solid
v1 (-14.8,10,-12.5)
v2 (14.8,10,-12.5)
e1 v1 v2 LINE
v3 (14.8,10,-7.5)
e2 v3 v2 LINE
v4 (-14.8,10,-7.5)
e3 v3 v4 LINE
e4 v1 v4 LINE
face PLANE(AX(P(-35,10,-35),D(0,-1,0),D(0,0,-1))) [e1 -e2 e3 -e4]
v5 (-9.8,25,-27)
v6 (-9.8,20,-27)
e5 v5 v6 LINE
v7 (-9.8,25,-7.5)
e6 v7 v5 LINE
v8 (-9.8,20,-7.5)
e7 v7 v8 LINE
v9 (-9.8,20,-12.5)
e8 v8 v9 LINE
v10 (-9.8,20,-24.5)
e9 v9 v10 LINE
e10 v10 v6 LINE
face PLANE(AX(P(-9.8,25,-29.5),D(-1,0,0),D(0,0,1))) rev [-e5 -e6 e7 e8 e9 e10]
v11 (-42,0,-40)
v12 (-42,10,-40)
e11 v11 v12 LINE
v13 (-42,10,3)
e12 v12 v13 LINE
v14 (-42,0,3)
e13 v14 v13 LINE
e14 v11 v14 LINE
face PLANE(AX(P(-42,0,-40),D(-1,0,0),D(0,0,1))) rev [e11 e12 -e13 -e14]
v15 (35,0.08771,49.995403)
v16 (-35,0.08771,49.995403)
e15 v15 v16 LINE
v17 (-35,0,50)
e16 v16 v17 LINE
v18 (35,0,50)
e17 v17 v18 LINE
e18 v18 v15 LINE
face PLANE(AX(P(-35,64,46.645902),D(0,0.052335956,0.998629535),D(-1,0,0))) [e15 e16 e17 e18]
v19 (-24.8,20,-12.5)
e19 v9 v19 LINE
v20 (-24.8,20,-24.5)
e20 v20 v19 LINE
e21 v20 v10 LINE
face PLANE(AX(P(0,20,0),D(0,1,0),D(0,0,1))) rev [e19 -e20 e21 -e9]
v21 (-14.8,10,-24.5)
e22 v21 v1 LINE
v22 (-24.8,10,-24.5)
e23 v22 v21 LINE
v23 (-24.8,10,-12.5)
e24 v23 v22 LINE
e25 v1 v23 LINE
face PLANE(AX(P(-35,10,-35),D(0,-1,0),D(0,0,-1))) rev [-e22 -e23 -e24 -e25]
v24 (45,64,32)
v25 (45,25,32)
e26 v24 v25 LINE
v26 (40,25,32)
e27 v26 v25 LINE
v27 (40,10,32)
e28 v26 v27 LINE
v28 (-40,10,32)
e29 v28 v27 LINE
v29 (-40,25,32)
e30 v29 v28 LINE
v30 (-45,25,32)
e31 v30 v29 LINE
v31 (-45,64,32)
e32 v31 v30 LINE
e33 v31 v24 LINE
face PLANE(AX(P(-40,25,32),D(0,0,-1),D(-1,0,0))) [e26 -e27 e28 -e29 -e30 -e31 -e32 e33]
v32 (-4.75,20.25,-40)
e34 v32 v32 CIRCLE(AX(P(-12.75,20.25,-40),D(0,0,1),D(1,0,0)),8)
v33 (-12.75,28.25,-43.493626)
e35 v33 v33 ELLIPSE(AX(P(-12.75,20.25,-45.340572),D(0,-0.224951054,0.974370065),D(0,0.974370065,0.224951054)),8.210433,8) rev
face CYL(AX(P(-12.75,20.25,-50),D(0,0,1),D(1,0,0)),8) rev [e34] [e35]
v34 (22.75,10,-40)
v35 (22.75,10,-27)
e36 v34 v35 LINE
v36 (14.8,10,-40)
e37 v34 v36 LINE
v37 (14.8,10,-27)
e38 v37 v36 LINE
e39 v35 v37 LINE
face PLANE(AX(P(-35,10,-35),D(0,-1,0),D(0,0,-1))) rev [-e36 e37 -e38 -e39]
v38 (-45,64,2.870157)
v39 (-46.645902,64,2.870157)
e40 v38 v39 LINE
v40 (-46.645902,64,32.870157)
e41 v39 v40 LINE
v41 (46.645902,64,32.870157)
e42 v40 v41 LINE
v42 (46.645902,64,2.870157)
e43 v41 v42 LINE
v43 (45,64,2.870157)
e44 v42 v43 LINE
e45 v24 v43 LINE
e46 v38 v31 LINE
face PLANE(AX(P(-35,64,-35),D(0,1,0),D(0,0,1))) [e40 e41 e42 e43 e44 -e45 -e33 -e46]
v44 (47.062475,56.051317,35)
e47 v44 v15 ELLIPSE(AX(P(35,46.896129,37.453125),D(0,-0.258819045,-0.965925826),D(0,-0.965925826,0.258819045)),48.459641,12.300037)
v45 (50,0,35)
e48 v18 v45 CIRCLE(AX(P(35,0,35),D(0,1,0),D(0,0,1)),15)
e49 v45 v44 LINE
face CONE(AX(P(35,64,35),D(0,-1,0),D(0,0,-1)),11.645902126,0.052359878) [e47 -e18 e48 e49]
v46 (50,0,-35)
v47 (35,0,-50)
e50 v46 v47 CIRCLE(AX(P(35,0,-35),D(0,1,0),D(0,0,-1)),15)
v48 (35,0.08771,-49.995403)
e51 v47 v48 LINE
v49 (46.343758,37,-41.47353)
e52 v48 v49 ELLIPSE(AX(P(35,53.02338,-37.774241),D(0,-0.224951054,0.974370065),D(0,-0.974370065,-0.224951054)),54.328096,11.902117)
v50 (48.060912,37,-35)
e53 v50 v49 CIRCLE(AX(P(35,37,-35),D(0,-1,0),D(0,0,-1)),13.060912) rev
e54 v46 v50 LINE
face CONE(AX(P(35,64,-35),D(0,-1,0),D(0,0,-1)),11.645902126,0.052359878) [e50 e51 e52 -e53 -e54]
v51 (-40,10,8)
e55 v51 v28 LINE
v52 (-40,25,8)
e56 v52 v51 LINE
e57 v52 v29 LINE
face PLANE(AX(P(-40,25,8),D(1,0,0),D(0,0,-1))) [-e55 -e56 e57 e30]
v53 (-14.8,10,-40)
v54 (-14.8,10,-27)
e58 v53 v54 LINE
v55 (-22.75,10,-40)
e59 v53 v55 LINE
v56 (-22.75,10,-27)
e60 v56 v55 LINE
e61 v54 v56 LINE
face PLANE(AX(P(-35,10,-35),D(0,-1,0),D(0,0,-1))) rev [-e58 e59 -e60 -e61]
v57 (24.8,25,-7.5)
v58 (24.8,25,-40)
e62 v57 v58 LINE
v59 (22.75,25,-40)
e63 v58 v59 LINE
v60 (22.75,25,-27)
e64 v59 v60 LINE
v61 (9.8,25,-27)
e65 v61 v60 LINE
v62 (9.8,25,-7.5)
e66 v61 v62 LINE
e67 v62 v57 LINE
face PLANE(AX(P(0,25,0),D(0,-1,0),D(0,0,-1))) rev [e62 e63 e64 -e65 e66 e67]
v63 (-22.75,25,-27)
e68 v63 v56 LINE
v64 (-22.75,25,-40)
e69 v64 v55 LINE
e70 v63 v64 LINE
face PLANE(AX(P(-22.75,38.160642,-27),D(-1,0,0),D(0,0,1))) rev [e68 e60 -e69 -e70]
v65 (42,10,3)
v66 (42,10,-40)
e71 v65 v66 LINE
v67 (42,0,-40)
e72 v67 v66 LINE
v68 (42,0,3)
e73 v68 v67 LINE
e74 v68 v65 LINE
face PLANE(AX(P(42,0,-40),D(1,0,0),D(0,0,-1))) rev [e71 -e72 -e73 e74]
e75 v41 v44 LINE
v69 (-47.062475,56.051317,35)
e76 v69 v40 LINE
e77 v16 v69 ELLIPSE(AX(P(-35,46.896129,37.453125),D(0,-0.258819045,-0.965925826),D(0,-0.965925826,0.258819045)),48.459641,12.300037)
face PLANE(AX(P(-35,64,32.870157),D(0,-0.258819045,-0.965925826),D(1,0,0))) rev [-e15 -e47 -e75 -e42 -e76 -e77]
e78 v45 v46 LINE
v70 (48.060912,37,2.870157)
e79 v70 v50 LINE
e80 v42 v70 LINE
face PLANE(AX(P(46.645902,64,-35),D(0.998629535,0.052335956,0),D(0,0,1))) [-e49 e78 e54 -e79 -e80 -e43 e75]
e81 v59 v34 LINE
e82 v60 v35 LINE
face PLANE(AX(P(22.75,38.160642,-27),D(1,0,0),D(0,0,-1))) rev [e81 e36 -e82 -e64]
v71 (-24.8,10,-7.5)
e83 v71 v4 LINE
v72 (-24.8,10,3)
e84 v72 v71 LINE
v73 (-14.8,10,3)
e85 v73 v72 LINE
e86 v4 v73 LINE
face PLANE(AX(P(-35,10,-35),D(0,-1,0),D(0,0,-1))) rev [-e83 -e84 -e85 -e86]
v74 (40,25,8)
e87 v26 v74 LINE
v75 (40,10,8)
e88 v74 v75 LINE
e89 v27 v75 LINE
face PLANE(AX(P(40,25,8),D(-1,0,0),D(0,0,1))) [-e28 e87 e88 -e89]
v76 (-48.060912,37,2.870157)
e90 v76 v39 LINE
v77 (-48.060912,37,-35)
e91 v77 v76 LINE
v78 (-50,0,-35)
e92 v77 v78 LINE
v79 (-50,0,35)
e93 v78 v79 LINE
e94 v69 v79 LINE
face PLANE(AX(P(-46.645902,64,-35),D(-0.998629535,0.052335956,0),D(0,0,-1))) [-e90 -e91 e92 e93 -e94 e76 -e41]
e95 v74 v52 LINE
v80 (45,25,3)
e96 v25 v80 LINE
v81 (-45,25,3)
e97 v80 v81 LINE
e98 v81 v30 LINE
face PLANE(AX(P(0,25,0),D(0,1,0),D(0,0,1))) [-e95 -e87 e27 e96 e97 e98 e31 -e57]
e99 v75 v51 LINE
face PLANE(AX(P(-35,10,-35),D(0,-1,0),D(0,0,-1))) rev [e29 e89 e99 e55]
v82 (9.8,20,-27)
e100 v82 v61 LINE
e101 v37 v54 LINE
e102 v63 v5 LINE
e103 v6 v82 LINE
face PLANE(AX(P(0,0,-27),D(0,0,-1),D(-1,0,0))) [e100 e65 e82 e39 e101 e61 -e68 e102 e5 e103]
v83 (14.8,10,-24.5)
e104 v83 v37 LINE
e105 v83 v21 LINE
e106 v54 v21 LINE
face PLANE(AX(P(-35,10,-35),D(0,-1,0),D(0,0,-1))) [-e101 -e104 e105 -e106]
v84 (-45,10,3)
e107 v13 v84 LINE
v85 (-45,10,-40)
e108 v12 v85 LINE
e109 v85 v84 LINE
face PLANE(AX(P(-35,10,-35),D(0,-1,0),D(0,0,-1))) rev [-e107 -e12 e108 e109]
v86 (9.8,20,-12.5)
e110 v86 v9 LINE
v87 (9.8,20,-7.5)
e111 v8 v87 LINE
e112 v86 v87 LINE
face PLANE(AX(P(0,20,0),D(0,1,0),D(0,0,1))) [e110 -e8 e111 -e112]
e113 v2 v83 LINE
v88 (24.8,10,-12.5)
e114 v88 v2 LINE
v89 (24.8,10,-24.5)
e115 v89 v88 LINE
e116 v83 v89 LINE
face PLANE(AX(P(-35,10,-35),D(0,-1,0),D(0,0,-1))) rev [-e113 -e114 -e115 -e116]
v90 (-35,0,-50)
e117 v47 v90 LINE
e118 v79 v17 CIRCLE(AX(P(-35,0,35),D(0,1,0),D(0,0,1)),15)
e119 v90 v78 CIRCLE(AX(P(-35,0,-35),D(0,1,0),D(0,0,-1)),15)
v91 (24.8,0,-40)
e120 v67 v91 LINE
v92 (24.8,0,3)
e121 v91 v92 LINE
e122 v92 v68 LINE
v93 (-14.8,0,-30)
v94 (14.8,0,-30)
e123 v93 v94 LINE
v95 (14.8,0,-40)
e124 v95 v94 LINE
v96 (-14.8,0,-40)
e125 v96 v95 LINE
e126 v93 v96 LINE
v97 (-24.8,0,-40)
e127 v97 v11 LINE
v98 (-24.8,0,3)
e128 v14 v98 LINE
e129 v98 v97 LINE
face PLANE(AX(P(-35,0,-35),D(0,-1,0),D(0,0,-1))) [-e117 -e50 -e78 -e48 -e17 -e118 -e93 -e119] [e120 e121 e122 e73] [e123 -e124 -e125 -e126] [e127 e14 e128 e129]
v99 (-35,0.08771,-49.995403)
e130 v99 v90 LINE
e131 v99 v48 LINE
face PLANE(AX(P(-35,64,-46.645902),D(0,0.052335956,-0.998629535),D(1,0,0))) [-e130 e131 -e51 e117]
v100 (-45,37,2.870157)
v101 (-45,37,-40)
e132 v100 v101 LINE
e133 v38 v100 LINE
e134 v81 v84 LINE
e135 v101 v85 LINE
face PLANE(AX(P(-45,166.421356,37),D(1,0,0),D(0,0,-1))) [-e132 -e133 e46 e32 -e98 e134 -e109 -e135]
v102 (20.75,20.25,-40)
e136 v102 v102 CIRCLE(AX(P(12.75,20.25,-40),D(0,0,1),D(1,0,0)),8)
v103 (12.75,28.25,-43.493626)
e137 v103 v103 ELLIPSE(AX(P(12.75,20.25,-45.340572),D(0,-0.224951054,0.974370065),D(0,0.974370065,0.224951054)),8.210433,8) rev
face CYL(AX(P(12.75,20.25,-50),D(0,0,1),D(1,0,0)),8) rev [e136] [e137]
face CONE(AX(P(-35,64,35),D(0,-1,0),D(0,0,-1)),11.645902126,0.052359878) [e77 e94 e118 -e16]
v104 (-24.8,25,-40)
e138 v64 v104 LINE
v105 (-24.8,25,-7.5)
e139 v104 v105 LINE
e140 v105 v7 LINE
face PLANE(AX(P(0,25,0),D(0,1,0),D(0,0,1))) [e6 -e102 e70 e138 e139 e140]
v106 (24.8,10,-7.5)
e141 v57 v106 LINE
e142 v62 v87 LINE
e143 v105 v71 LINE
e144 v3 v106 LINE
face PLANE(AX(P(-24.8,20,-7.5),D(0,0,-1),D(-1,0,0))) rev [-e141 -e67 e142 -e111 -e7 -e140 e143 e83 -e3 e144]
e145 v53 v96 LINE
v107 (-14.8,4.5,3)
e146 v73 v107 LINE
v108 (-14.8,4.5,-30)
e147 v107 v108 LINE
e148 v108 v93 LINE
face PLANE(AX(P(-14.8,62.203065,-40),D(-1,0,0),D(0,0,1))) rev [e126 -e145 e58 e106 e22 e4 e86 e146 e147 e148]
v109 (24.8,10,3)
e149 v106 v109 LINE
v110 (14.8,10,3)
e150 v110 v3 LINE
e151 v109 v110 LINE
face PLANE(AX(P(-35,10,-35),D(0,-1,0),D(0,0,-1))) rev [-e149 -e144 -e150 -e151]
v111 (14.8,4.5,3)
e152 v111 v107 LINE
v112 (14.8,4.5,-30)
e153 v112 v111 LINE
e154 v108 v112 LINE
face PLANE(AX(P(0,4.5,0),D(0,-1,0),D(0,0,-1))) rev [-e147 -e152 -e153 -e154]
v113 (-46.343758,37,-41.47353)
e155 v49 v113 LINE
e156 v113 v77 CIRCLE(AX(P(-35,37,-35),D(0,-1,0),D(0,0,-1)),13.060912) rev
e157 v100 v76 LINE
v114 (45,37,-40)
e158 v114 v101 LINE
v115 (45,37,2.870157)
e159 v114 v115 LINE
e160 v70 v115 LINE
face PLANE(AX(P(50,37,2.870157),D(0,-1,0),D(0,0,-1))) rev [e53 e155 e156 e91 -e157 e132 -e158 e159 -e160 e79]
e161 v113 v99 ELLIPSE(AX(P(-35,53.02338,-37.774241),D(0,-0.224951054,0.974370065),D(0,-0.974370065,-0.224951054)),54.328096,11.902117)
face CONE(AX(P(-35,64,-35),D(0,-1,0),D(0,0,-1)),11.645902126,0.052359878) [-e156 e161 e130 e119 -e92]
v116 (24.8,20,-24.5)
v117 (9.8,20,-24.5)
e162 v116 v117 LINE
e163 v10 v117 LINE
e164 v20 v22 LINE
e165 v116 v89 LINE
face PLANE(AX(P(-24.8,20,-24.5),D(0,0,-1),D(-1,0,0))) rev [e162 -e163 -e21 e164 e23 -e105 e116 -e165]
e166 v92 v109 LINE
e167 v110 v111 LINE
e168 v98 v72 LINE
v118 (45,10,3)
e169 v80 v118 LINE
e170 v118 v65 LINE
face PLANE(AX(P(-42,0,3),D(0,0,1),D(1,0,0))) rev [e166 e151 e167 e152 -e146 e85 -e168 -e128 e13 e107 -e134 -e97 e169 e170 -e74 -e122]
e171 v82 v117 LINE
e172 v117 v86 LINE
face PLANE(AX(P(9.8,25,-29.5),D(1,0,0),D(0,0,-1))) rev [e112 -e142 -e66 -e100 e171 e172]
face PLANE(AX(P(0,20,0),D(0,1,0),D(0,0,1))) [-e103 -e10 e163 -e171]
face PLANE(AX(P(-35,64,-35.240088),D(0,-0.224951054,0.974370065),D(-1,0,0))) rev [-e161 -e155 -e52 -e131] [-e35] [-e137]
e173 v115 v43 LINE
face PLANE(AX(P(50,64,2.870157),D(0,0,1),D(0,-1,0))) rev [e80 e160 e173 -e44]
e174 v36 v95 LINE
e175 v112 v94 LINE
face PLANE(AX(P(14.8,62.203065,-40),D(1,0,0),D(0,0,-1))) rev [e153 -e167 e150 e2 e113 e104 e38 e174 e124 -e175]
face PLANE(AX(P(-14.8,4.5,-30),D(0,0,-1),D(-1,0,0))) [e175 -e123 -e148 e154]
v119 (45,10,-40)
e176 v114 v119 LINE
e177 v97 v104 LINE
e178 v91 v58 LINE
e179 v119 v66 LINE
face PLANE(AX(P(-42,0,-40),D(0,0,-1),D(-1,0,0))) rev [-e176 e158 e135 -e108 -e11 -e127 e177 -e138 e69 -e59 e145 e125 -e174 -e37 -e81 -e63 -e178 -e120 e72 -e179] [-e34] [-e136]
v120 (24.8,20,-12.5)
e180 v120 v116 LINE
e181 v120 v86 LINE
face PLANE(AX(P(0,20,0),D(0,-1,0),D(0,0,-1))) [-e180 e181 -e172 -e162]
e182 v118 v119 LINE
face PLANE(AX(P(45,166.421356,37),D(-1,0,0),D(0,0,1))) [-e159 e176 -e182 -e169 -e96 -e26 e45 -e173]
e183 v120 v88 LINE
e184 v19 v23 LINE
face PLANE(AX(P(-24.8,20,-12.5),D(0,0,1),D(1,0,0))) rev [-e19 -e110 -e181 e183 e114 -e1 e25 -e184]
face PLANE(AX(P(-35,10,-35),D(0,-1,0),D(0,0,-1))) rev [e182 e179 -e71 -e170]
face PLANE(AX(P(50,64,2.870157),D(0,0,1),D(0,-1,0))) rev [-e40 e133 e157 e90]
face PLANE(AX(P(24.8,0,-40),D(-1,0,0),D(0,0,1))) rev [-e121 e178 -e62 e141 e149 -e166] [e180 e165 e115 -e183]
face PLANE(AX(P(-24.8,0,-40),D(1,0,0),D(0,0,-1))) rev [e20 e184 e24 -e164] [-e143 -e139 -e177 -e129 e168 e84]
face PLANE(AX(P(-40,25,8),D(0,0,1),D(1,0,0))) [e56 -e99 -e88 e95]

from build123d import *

# Parameters (mm, degrees)
BOSS_EXTRUDE1_DEPTH     = 10
SKETCH2_W               = 17.2
SKETCH2_H               = 43
CUT_EXTRUDE1_DEPTH      = 72.414284285
SKETCH3_W               = 90
SKETCH3_H               = 34
SKETCH3_W_2             = 80
SKETCH3_H_2             = 24
BOSS_EXTRUDE3_DEPTH     = 15
SKETCH4_W               = 49.6
SKETCH4_H               = 5
BOSS_EXTRUDE4_DEPTH     = 10
SKETCH5_W               = 15
SKETCH5_H               = 22
BOSS_EXTRUDE5_DEPTH     = 5
SKETCH6_W               = 90
SKETCH6_H               = 77
BOSS_EXTRUDE6_DEPTH     = 15
BOSS_EXTRUDE8_DEPTH     = 39
CHAMFER1_SIZE           = 64
CHAMFER1_SIZE_2         = 3.354097874
CHAMFER2_SIZE           = 64
CHAMFER2_SIZE_2         = 11.405813635
CHAMFER3_SIZE           = 64
CHAMFER3_SIZE_2         = 13.775745352
CUT_EXTRUDE3_DEPTH      = 95.500525601
CUT_EXTRUDE3_DEPTH_BACK = 95.500525601
SKETCH10_W              = 50
SKETCH10_H              = 27
SKETCH15_R              = 8
CUT_EXTRUDE5_DEPTH      = 122.227059686
CUT_EXTRUDE6_DEPTH      = 2.5
SKETCH18_W              = 29.6
SKETCH18_H              = 43
CUT_EXTRUDE7_DEPTH      = 10
CUT_EXTRUDE8_DEPTH      = 15
SKETCH21_W              = 29.6
SKETCH21_H              = 33
BOSS_EXTRUDE10_DEPTH    = 4.5
SKETCH23_W              = 2.05
SKETCH23_H              = 13
BOSS_EXTRUDE11_DEPTH    = 15


with BuildPart() as part:
    # Sketch1 → Boss-Extrude1 (new body)
    with BuildSketch(Plane(origin=(0, 0, 0), x_dir=(1, 0, 0), z_dir=(0, 1, 0))):
        with BuildLine():
            Line((-35, 50), (35, 50))
            ThreePointArc((35, 50), (45.606601718, 45.606601718), (50, 35))
            Line((50, 35), (50, -35))
            ThreePointArc((50, -35), (45.606601718, -45.606601718), (35, -50))
            Line((35, -50), (-35, -50))
            ThreePointArc((-35, -50), (-45.606601718, -45.606601718), (-50, -35))
            Line((-50, -35), (-50, 35))
            ThreePointArc((-50, 35), (-45.606601718, 45.606601718), (-35, 50))
        make_face()
    extrude(amount=BOSS_EXTRUDE1_DEPTH)

    # Sketch2 → Cut-Extrude1 (cut, through all)
    with BuildSketch(Plane(origin=(0, 10, 0), x_dir=(1, 0, 0), z_dir=(0, 1, 0))):
        with Locations((-33.4, 18.5)):
            Rectangle(SKETCH2_W, SKETCH2_H)
        with Locations((33.4, 18.5)):
            Rectangle(SKETCH2_W, SKETCH2_H)
    extrude(amount=-CUT_EXTRUDE1_DEPTH, mode=Mode.SUBTRACT)

    # Sketch3 → Boss-Extrude3 (add)
    with BuildSketch(Plane(origin=(0, 10, 0), x_dir=(1, 0, 0), z_dir=(0, 1, 0))):
        with Locations((0, -20)):
            Rectangle(SKETCH3_W, SKETCH3_H)
        with Locations((0, -20)):
            Rectangle(SKETCH3_W_2, SKETCH3_H_2, mode=Mode.SUBTRACT)
    extrude(amount=BOSS_EXTRUDE3_DEPTH)

    # Sketch4 → Boss-Extrude4 (add)
    with BuildSketch(Plane(origin=(0, 10, 0), x_dir=(1, 0, 0), z_dir=(0, 1, 0))):
        with Locations((0, 10)):
            Rectangle(SKETCH4_W, SKETCH4_H)
        with Locations((0, 27)):
            Rectangle(SKETCH4_W, SKETCH4_H)
    extrude(amount=BOSS_EXTRUDE4_DEPTH)

    # Sketch5 → Boss-Extrude5 (add)
    with BuildSketch(Plane(origin=(0, 20, 0), x_dir=(1, 0, 0), z_dir=(0, 1, 0))):
        with Locations((-17.3, 18.5)):
            Rectangle(SKETCH5_W, SKETCH5_H)
        with Locations((17.3, 18.5)):
            Rectangle(SKETCH5_W, SKETCH5_H)
    extrude(amount=BOSS_EXTRUDE5_DEPTH)

    # Sketch6 → Boss-Extrude6 (add)
    with BuildSketch(Plane(origin=(0, 10, 0), x_dir=(1, 0, 0), z_dir=(0, 1, 0))):
        with BuildLine():
            Line((-50, 35), (-50, -35))
            ThreePointArc((-50, -35), (-45.606601718, -45.606601718), (-35, -50))
            Line((-35, -50), (35, -50))
            ThreePointArc((35, -50), (45.606601718, -45.606601718), (50, -35))
            Line((50, -35), (50, 35))
            ThreePointArc((50, 35), (45.606601718, 45.606601718), (35, 50))
            Line((35, 50), (-35, 50))
            ThreePointArc((-35, 50), (-45.606601718, 45.606601718), (-50, 35))
        make_face()
        with Locations((0, 1.5)):
            Rectangle(SKETCH6_W, SKETCH6_H, mode=Mode.SUBTRACT)
    extrude(amount=BOSS_EXTRUDE6_DEPTH)

    # Sketch9 → Boss-Extrude8 (add)
    with BuildSketch(Plane(origin=(0, 25, 0), x_dir=(1, 0, 0), z_dir=(0, 1, 0))):
        with BuildLine():
            Line((-50, 35), (-50, -35))
            ThreePointArc((-50, -35), (-45.606601718, -45.606601718), (-35, -50))
            Line((-35, -50), (35, -50))
            ThreePointArc((35, -50), (45.606601718, -45.606601718), (50, -35))
            Line((50, -35), (50, 35))
            ThreePointArc((50, 35), (45.606601718, 45.606601718), (35, 50))
            Line((35, 50), (-35, 50))
            ThreePointArc((-35, 50), (-45.606601718, 45.606601718), (-50, 35))
        make_face()
        with BuildLine():
            Line((-45, 35), (-45, -32))
            Line((-45, -32), (45, -32))
            Line((45, -32), (45, 35))
            ThreePointArc((45, 35), (44.659258263, 37.588190451), (43.660254038, 40))
            Line((43.660254038, 40), (-43.660254038, 40))
            ThreePointArc((-43.660254038, 40), (-44.659258263, 37.588190451), (-45, 35))
        make_face(mode=Mode.SUBTRACT)
    extrude(amount=BOSS_EXTRUDE8_DEPTH)

    # Chamfer1
    # the kernel refuses this chamfer: 64, 3.354097874 mm, written as the material it takes off along each edge
    with BuildSketch(Plane(origin=(-35, 64, 50), x_dir=(0, -0.9999979738662979, 0.002013023422382214), z_dir=(1, 0, 0)), Plane(origin=(50, 64, 35), x_dir=(0.002013023422382214, -0.9999979738662979, 0), z_dir=(0, 0, -1)), Plane(origin=(-50, 64, -35), x_dir=(-0.002013023422382214, -0.9999979738662979, 0), z_dir=(0, 0, 1)), Plane(origin=(35, 64, -50), x_dir=(0, -0.9999979738662979, -0.002013023422382214), z_dir=(-1, 0, 0))) as chamfer1_piece_1:
        Polygon((CHAMFER1_SIZE * 0.999997973866, CHAMFER1_SIZE * 0.00201302342238), (-CHAMFER1_SIZE_2 * 0.00201302342245, CHAMFER1_SIZE_2 * 0.9999979739), (0, 0), align=None)
    extrude(amount=70, mode=Mode.SUBTRACT)
    with BuildSketch(Plane(origin=(35, 64, 35), x_dir=(0, 0, 1), z_dir=(-1, 0, 0))) as chamfer1_piece_2:
        Polygon((15, -CHAMFER1_SIZE), (15 - CHAMFER1_SIZE_2, 0), (15, 0), align=None)
    revolve(axis=Axis((35, 64, 35), (0, 1, 0)), revolution_arc=90, mode=Mode.SUBTRACT)
    with BuildSketch(Plane(origin=(-35, 64, 35), x_dir=(-1, 0, 0), z_dir=(0, 0, -1))) as chamfer1_piece_3:
        Polygon((15, -CHAMFER1_SIZE), (15 - CHAMFER1_SIZE_2, 0), (15, 0), align=None)
    revolve(axis=Axis((-35, 64, 35), (0, 1, 0)), revolution_arc=90, mode=Mode.SUBTRACT)
    with BuildSketch(Plane(origin=(35, 64, -35), x_dir=(1, 0, 0), z_dir=(0, 0, 1))) as chamfer1_piece_4:
        Polygon((15, -CHAMFER1_SIZE), (15 - CHAMFER1_SIZE_2, 0), (15, 0), align=None)
    revolve(axis=Axis((35, 64, -35), (0, 1, 0)), revolution_arc=90, mode=Mode.SUBTRACT)
    with BuildSketch(Plane(origin=(-35, 64, -35), x_dir=(0, 0, -1), z_dir=(1, 0, 0))) as chamfer1_piece_5:
        Polygon((15 - CHAMFER1_SIZE_2, 0), (15, -CHAMFER1_SIZE), (15, 0), align=None)
    revolve(axis=Axis((-35, 64, -35), (0, 1, 0)), revolution_arc=90, mode=Mode.SUBTRACT)

    # Chamfer2
    # the kernel refuses this chamfer: 64, 11.405813635 mm, written as the material it takes off along each edge
    with BuildSketch(Plane(origin=(201.306482971, 64, -46.645902126), x_dir=(0, -0.9982575003065525, -0.05900816114499234), z_dir=(-1, 0, 0))) as chamfer2_piece_1:
        Polygon((CHAMFER2_SIZE * 0.999977671636, CHAMFER2_SIZE * 0.0066825316561), (-CHAMFER2_SIZE_2 * 0.0590081611462, CHAMFER2_SIZE_2 * 0.998257500326), (0, 0), align=None)
    extrude(amount=402.612965942, mode=Mode.SUBTRACT)

    # Chamfer3
    # the kernel refuses this chamfer: 64, 13.775745352 mm, written as the material it takes off along each edge
    with BuildSketch(Plane(origin=(-201.265469314, 64, 46.645902126), x_dir=(0, -0.9981787050157903, 0.06032638604292662), z_dir=(1, 0, 0))) as chamfer3_piece_1:
        Polygon((CHAMFER3_SIZE * 0.999967974892, CHAMFER3_SIZE * 0.00800307379952), (-CHAMFER3_SIZE_2 * 0.060326386045, CHAMFER3_SIZE_2 * 0.99817870505), (0, 0), align=None)
    extrude(amount=402.530938629, mode=Mode.SUBTRACT)

    # Sketch10 → Cut-Extrude3 (cut, two sides: drawn at the far end of the back side and taken through both)
    with BuildSketch(Plane(origin=(0, 1.307501734, 0), x_dir=(0, 0, 1), z_dir=(-1, 0, 0)).offset(-CUT_EXTRUDE3_DEPTH_BACK)):
        with Locations((-22.129843227, 49.192498266)):
            Rectangle(SKETCH10_W, SKETCH10_H)
    extrude(amount=CUT_EXTRUDE3_DEPTH + CUT_EXTRUDE3_DEPTH_BACK, mode=Mode.SUBTRACT)

    # Sketch15 → Cut-Extrude5 (cut, through all)
    with BuildSketch(Plane.XY.offset(-40)):
        with Locations((-12.75, 20.25)):
            Circle(SKETCH15_R)
        with Locations((12.75, 20.25)):
            Circle(SKETCH15_R)
    extrude(amount=-CUT_EXTRUDE5_DEPTH, mode=Mode.SUBTRACT)

    # Sketch17 → Cut-Extrude6 (cut)
    with BuildSketch(Plane(origin=(0, 0, -29.5), x_dir=(-1, 0, 0), z_dir=(0, 0, -1))):
        Polygon((-24.8, 10), (24.8, 10), (24.8, 25), (9.8, 25), (9.8, 20), (-9.8, 20), (-9.8, 25), (-24.8, 25), align=None)
    extrude(amount=-CUT_EXTRUDE6_DEPTH, mode=Mode.SUBTRACT)

    # Sketch18 → Cut-Extrude7 (cut)
    with BuildSketch(Plane.XZ):
        with Locations((0, -18.5)):
            Rectangle(SKETCH18_W, SKETCH18_H)
    extrude(amount=-CUT_EXTRUDE7_DEPTH, mode=Mode.SUBTRACT)

    # Sketch20 → Cut-Extrude8 (cut)
    with BuildSketch(Plane.XZ.offset(-25)):
        with BuildLine():
            Line((-45, -35), (-45, -40))
            Line((-45, -40), (-43.660254038, -40))
            ThreePointArc((-43.660254038, -40), (-44.659258263, -37.588190451), (-45, -35))
        make_face()
        with BuildLine():
            Line((45, -40), (45, -35))
            ThreePointArc((45, -35), (44.659258263, -37.588190451), (43.660254038, -40))
            Line((43.660254038, -40), (45, -40))
        make_face()
    extrude(amount=-CUT_EXTRUDE8_DEPTH, mode=Mode.SUBTRACT)

    # Sketch21 → Boss-Extrude10 (add)
    with BuildSketch(Plane.XZ):
        with Locations((0, -13.5)):
            Rectangle(SKETCH21_W, SKETCH21_H)
    extrude(amount=-BOSS_EXTRUDE10_DEPTH)

    # Sketch23 → Boss-Extrude11 (add)
    with BuildSketch(Plane(origin=(0, 10, 0), x_dir=(1, 0, 0), z_dir=(0, 1, 0))):
        with Locations((-23.775, 33.5)):
            Rectangle(SKETCH23_W, SKETCH23_H)
        with Locations((23.775, 33.5)):
            Rectangle(SKETCH23_W, SKETCH23_H)
    extrude(amount=BOSS_EXTRUDE11_DEPTH)


solid = part.part
